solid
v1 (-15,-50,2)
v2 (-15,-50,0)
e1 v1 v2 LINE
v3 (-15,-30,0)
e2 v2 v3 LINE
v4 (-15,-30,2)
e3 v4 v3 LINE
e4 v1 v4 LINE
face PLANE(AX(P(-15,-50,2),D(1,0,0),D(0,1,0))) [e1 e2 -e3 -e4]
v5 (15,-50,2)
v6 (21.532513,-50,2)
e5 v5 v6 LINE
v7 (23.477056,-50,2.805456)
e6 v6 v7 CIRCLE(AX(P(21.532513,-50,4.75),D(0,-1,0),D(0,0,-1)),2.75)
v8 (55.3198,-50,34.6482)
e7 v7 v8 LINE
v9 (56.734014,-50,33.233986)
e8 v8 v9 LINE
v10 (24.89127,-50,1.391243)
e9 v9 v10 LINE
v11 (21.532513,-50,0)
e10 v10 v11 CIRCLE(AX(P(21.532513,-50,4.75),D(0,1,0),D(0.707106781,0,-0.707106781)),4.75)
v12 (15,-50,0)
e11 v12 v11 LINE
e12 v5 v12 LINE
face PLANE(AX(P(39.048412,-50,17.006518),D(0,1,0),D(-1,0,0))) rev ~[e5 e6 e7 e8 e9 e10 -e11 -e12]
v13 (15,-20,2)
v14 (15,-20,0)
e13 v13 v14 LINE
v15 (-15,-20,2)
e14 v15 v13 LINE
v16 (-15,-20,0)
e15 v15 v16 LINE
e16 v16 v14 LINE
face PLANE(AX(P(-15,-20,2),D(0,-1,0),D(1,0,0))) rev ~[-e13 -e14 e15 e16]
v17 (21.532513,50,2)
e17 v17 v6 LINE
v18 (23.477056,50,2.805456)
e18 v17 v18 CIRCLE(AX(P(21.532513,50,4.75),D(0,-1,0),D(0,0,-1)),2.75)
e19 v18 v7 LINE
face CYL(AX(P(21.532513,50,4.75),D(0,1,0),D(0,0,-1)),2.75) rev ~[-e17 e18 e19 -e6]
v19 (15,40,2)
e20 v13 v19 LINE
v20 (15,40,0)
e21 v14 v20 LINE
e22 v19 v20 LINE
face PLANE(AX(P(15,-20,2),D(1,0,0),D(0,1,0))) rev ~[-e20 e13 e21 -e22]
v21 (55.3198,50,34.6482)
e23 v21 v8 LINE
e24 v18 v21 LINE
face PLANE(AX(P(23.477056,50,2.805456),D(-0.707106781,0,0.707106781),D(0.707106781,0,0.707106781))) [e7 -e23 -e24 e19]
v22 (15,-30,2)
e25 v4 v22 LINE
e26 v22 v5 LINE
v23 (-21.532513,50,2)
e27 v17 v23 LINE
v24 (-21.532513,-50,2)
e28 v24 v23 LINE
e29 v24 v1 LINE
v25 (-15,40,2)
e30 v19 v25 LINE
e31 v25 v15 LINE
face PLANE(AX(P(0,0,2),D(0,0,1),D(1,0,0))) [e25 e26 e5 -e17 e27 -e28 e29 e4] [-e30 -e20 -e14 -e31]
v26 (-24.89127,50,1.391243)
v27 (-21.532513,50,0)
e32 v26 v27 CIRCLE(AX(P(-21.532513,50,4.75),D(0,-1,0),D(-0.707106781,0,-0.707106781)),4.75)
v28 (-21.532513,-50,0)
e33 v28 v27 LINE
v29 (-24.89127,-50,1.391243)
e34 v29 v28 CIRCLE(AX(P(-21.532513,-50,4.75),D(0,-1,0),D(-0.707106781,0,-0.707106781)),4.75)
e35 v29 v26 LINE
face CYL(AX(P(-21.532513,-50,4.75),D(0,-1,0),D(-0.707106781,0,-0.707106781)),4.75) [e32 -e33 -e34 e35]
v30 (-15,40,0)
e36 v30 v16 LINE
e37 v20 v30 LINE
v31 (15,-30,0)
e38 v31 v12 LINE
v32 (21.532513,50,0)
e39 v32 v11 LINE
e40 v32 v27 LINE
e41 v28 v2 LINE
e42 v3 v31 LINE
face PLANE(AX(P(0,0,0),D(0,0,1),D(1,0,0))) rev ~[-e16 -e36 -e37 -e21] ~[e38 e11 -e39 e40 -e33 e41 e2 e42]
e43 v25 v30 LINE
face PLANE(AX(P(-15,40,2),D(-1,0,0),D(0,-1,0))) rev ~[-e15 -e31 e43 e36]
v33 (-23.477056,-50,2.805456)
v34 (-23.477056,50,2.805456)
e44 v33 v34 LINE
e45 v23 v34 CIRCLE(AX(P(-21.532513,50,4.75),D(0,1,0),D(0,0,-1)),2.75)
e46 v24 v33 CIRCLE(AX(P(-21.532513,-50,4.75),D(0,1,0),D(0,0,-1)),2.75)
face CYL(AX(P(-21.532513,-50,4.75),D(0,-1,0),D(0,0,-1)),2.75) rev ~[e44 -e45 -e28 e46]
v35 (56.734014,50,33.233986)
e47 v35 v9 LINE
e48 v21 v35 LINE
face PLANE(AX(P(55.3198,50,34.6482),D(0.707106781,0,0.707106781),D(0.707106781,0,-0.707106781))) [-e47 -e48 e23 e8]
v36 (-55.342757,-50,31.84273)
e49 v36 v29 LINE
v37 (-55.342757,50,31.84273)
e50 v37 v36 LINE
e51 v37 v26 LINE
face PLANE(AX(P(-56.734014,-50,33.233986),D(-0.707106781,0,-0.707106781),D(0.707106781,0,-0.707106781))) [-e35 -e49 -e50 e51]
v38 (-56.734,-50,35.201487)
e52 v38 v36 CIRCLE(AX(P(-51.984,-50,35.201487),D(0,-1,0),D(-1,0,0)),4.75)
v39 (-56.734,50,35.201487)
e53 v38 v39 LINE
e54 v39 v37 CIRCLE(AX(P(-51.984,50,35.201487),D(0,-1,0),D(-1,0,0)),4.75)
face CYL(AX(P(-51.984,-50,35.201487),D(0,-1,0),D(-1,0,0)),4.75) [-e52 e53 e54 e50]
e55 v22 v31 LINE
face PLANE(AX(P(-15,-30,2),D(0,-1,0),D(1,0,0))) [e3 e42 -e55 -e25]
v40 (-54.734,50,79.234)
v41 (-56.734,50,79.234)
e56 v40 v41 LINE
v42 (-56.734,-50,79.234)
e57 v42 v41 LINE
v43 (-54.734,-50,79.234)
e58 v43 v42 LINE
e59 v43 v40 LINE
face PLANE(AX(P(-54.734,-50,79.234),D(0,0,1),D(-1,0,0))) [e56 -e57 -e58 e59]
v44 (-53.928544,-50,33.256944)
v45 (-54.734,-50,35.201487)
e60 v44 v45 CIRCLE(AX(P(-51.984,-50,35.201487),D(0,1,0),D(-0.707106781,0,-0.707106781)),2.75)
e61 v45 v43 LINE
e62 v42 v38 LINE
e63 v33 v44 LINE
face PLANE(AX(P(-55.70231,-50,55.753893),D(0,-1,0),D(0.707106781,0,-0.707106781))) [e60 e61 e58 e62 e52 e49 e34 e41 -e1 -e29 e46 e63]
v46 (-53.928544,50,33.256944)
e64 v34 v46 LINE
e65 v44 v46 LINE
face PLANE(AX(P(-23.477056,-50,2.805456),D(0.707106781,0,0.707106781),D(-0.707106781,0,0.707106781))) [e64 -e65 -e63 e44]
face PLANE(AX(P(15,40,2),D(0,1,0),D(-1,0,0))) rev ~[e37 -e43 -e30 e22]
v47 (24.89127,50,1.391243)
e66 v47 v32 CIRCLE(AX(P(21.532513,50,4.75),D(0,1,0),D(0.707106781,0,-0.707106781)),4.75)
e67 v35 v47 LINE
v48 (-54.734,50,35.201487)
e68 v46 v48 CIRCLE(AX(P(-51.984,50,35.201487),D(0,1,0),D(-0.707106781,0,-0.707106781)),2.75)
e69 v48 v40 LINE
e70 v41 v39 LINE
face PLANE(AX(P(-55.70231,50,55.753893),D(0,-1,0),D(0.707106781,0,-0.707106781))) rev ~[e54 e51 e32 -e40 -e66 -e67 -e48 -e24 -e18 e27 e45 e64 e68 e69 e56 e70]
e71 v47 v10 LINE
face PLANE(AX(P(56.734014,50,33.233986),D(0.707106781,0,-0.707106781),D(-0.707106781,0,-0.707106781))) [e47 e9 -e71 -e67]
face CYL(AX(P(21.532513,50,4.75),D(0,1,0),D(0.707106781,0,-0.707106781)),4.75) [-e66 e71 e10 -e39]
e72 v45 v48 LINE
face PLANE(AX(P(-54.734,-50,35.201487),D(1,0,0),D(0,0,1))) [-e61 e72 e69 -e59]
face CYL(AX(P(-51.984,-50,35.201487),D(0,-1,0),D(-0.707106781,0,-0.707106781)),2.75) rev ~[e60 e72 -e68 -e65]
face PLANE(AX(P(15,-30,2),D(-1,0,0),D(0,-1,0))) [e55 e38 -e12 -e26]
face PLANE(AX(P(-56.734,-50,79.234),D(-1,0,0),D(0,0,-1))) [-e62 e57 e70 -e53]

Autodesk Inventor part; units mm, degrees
ref_plane "YZ Plane" through (0, 0, 0) normal (1, 0, 0) x (0, 1, 0)
ref_plane "XZ Plane" through (0, 0, 0) normal (0, 1, 0) x (-1, 0, 0)
ref_plane "XY Plane" through (0, 0, 0) normal (0, 0, 1) x (1, 0, 0)
sketch "Sketch1" plane through (0, 0, 0) normal (0, 0, 1) x (1, 0, 0)
  line L0 (-23.5, -50) -> (23.5, -50)
  line L1 (23.5, -50) -> (23.5, 50)
  line L2 (23.5, 50) -> (-23.5, 50)
  line L3 (-23.5, 50) -> (-23.5, -50)
  line L4 (-23.5, -50) -> (23.5, 50) construction
  line L5 (23.5, -50) -> (-23.5, 50) construction
  point P0 (0, 0)
  dimension "d154" = 47
  dimension "d155" = 100
extrude "Plate3" add sketch "Sketch1" along normal blind 2
sketch "Sketch7" plane through (22.0858, 50, 1.4142) normal (0.7071068, 0, -0.7071068) x (0, 1, 0)
  line L0 (-100, 0) -> (0, 0)
  line L1 (0, 0) -> (0, 47)
  line L2 (0, 47) -> (-100, 47)
  line L3 (-100, 47) -> (-100, 0)
edge flange "Flange3" height 47 angle 45 thickness 2 bend radius 2.75 thickness toward (0.7071068, 0, -0.7071068) relief round relief width 2 relief depth 1 corner gap 2.75 corner form 0 edges at (23.5, 0, 2) (-23.5, 0, 2) wall of the first edge with corners at (22.0858, -50, 1.4142) (22.0858, 50, 1.4142) (55.3198, 50, 34.6482) (55.3198, -50, 34.6482)
bend "Bend3"
corner "Corner3"
sketch "Sketch8" plane through (0, 0, 2) normal (0, 0, 1) x (1, 0, 0)
  line L0 (15, 40) -> (-15, 40)
  line L1 (-15, 40) -> (-15, -20)
  line L2 (-15, -20) -> (15, -20)
  line L3 (15, -20) -> (15, 40)
  line L4 (15, 40) -> (-15, -20) construction
  line L5 (-15, 40) -> (15, -20) construction
  line L6 (-23.5, 50) -> (21.5325, 50) projected
  line L7 (-21.5325, -50) -> (21.5325, -50) projected
  line L8 (15, -50) -> (-15, -50)
  line L9 (-15, -50) -> (-15, -30)
  line L10 (-15, -30) -> (15, -30)
  line L11 (15, -30) -> (15, -50)
  point P0 (0, 0)
  point P1 (0, 10)
  point P2 (-15, -50)
  dimension "d166" = 30
  dimension "d168" = 10
  dimension "d182" = 10
  dimension "d183" = 20
extrude "Cut1" cut sketch "Sketch8" against normal blind 2
sketch "Sketch9" plane through (-54.734, -50, 33.234) normal (-1, 0, 0) x (0, -1, 0)
  line L0 (-100, 0) -> (0, 0)
  line L1 (0, 0) -> (0, 46)
  line L2 (0, 46) -> (-100, 46)
  line L3 (-100, 46) -> (-100, 0)
edge flange "Flange4" height 46 angle 45 thickness 2 bend radius 2.75 thickness toward (-1, 0, 0) relief round relief width 2 relief depth 1 edges at (-55.3198, 0, 34.6482) wall of the first edge with corners at (-54.734, 50, 33.234) (-54.734, -50, 33.234) (-54.734, -50, 79.234) (-54.734, 50, 79.234)
bend "Bend4"
corner "Corner4"
properties part number "MNT-CDF-503  main tube 1" material "Stainless Steel"
